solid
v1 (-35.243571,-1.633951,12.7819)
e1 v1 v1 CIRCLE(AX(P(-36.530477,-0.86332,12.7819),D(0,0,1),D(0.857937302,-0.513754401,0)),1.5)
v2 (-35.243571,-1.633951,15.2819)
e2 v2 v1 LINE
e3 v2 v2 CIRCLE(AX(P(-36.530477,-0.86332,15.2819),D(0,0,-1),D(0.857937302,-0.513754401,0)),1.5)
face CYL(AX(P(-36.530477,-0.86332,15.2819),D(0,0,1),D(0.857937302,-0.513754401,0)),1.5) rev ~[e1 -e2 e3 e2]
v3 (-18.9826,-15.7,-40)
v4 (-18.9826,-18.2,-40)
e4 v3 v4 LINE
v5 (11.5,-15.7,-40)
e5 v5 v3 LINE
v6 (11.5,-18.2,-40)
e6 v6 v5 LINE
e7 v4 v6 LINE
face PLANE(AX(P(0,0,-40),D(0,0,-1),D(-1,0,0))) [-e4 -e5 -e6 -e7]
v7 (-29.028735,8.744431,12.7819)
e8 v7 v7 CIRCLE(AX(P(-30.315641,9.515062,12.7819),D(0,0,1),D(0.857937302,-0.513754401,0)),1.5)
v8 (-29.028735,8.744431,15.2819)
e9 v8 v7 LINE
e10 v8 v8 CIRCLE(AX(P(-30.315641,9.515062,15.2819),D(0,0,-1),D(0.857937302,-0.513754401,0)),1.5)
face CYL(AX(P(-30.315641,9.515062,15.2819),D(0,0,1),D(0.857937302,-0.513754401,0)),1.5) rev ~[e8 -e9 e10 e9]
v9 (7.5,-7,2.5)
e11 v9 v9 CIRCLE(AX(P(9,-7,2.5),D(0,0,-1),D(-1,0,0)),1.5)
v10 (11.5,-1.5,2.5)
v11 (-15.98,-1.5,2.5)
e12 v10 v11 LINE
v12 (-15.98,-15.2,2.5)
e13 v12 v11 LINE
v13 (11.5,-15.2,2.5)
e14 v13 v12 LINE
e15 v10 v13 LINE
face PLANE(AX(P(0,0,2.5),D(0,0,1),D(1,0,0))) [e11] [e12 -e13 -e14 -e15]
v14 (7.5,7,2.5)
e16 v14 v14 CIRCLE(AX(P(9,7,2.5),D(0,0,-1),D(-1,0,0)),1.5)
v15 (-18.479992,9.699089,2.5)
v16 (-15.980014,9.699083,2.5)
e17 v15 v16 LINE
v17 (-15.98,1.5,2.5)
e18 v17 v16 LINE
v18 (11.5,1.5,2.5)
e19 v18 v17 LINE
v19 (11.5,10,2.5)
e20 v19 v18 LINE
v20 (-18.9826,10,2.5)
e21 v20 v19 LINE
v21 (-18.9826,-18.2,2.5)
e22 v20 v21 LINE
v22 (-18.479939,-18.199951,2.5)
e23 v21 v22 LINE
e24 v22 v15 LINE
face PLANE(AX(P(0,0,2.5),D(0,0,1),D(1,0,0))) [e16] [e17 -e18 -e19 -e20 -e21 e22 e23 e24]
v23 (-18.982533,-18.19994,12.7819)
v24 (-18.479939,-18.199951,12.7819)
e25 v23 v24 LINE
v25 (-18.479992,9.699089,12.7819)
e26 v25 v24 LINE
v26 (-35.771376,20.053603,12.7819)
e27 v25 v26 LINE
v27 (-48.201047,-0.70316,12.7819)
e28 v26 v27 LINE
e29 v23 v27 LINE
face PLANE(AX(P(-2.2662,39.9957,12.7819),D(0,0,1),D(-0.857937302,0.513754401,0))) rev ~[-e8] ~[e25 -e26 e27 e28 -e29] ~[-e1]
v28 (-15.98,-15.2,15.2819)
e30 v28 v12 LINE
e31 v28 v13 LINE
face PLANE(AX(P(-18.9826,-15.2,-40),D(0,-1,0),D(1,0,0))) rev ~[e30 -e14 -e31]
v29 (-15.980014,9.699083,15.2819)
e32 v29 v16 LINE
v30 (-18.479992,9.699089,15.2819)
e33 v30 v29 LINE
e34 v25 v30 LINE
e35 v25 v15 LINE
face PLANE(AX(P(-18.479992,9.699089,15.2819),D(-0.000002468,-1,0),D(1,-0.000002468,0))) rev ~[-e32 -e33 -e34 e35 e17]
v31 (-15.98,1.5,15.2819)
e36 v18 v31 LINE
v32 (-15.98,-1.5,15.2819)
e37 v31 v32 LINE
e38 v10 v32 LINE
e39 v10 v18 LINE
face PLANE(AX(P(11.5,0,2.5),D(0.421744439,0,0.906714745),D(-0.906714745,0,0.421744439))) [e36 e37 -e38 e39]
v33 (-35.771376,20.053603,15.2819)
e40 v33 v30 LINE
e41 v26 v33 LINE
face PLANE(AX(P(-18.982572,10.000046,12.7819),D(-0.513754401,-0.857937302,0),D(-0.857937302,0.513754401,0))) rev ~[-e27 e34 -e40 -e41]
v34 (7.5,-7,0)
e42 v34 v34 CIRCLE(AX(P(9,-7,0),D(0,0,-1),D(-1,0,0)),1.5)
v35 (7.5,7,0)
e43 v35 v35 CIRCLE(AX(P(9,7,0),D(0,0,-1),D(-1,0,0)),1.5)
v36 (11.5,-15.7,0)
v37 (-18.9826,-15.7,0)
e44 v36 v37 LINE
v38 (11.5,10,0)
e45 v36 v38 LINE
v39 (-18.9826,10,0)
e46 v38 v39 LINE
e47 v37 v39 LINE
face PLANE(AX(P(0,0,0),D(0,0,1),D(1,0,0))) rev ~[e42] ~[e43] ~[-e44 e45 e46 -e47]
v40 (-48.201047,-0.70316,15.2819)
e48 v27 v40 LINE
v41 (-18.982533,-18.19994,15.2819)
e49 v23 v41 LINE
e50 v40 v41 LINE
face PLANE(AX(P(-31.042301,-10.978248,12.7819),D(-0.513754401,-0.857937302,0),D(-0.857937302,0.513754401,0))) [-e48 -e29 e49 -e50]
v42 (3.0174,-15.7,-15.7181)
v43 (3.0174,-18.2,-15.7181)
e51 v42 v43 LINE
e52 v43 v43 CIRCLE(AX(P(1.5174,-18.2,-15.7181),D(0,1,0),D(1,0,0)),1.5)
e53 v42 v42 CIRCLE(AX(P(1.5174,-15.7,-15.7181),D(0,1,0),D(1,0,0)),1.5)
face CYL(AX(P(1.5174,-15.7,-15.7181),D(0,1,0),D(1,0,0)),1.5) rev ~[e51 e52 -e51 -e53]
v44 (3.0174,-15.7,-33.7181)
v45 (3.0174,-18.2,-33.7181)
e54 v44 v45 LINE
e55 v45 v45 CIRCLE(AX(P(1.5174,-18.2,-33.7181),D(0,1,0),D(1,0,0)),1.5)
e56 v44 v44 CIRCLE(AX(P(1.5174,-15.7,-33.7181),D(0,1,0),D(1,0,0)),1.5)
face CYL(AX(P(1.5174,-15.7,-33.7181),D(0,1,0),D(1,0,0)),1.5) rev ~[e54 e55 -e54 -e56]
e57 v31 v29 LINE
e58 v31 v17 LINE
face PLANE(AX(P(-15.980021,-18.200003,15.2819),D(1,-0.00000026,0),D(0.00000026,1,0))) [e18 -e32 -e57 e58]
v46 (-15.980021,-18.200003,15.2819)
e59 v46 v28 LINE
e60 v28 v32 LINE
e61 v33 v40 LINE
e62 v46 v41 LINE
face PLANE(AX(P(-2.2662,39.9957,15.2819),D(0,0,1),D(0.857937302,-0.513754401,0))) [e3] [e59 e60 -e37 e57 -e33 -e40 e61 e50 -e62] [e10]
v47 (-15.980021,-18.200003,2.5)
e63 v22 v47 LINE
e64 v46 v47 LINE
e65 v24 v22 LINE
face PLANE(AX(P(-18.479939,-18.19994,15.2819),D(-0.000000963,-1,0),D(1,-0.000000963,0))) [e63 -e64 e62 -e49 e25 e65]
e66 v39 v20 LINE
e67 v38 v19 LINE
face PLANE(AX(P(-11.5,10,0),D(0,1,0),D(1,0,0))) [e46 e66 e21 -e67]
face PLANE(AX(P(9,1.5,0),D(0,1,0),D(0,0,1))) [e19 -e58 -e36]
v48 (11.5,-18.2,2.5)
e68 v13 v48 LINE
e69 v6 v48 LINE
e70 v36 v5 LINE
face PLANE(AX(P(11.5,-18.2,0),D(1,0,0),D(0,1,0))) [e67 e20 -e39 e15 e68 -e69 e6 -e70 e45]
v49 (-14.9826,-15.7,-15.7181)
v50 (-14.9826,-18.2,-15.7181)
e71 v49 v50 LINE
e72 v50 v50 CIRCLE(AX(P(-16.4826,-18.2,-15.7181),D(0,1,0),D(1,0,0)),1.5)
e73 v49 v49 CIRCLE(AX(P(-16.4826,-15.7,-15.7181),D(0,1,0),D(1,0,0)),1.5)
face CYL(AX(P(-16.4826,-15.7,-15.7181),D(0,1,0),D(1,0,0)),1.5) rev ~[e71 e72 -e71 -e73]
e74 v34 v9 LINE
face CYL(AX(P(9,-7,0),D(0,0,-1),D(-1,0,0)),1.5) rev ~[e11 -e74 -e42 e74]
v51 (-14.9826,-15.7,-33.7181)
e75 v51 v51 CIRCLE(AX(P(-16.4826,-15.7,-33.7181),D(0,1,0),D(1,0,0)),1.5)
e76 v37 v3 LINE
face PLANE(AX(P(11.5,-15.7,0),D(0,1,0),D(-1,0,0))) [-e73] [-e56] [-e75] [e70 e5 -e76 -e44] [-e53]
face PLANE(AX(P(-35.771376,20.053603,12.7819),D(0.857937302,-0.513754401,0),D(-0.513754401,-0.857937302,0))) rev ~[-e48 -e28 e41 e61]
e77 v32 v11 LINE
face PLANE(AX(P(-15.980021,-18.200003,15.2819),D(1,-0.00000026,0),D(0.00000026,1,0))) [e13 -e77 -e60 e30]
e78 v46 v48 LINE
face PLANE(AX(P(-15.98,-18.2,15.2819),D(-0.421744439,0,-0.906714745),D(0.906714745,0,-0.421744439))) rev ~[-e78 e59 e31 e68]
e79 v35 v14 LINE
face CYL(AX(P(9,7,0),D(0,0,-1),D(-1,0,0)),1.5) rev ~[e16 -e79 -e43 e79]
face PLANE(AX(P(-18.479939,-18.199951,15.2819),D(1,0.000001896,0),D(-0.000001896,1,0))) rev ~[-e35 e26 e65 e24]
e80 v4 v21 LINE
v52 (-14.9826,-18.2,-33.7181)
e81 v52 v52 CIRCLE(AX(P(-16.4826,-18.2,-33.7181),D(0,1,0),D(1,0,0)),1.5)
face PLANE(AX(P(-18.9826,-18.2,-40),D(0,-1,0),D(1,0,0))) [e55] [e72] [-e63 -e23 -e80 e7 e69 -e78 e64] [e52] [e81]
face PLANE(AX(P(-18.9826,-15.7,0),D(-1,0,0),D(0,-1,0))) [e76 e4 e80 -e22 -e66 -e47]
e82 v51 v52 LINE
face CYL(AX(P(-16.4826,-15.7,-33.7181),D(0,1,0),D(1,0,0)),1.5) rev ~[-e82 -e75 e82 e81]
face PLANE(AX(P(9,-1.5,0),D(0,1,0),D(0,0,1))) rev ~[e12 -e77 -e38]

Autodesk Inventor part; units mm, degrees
ref_plane "YZ Plane" through (0, 0, 0) normal (1, 0, 0) x (0, 1, 0)
ref_plane "XZ Plane" through (0, 0, 0) normal (0, 1, 0) x (-1, 0, 0)
ref_plane "XY Plane" through (0, 0, 0) normal (0, 0, 1) x (1, 0, 0)
sketch "Sketch1" plane through (0, 0, 0) normal (0, 0, 1) x (1, 0, 0)
  line L0 (-18.9826, -15.7) -> (4.0174, -15.7) projected
  line L1 (11.5, 10) -> (11.5, -10) projected
  line L2 (11.5, -10) -> (-11.5, -10) projected
  line L3 (-11.5, -10) -> (-11.5, 10) projected
  line L4 (-11.5, 10) -> (11.5, 10) projected
  line L5 (-18.9826, -15.7) -> (-18.9826, -14) projected
  line L6 (-18.9826, -15.7) -> (-18.9826, -18.2)
  line L7 (-18.9826, -18.2) -> (11.5, -18.2)
  line L8 (11.5, -18.2) -> (11.5, 10)
  line L9 (11.5, 10) -> (-18.9826, 10)
  line L10 (-18.9826, 10) -> (-18.9826, -18.2)
  point P0 (0, 0)
  dimension "d0" = 2.5
extrude "Extrusion1" add sketch "Sketch1" along normal blind 2.5
sketch "Sketch2" plane through (0, 0, 0) normal (0, 0, -1) x (-1, 0, 0)
  line L0 (18.9826, 10) -> (18.9826, -18.2) projected
  line L1 (-11.5, -18.2) -> (-11.5, 10) projected
  line L2 (18.9826, -18.2) -> (-11.5, -18.2)
  line L3 (-11.5, -18.2) -> (-11.5, -15.7)
  line L4 (-11.5, -15.7) -> (18.9826, -15.7)
  line L5 (18.9826, -15.7) -> (18.9826, -18.2)
  point P0 (0, 0)
  dimension "d3" = 2.5
extrude "Extrusion2" add sketch "Sketch2" along normal blind 40
sketch "Sketch4" plane through (-18.9826, -15.7, 0) normal (0, 1, 0) x (1, 0, 0)
  line L0 (23, 13.2181) -> (23, 36.2181) projected
  line L1 (23, 36.2181) -> (0, 36.2181) projected
  line L2 (0, 36.2181) -> (0, 13.2181) projected
  line L3 (0, 13.2181) -> (23, 13.2181) projected
  circle A0 centre (20.5, 15.7181) radius 1.5 projected
  circle A1 centre (20.5, 33.7181) radius 1.5 projected
  circle A2 centre (2.5, 33.7181) radius 1.5 projected
  circle A3 centre (2.5, 15.7181) radius 1.5 projected
  point P0 (18.9826, 0)
extrude "Extrusion3" cut sketch "Sketch4" against normal blind 40 contours A0 | A1 | A2 | A3
sketch "Sketch5" plane through (0, 0, 0) normal (0, 0, -1) x (-1, 0, 0)
  line L0 (9.8803, 8.3507) -> (9.8803, -8.3507) projected
  line L1 (9.8803, -8.3507) -> (5.0848, -8.3507) projected
  line L2 (5.0848, -8.3507) -> (5.0848, 8.3507) projected
  line L3 (5.0848, 8.3507) -> (9.8803, 8.3507) projected
  line L4 (-11.5, -10) -> (11.5, -10) projected
  line L5 (11.5, -10) -> (11.5, 10) projected
  line L6 (11.5, 10) -> (-11.5, 10) projected
  line L7 (-11.5, 10) -> (-11.5, -10) projected
  circle A0 centre (-9, -7) radius 1.5 projected
  circle A1 centre (-9, 7) radius 1.5 projected
  point P0 (0, 0)
extrude "Extrusion4" cut sketch "Sketch5" against normal blind 40 contours A0 | A1
ref_plane "Work Plane1" through (-2.2662, 39.9957, 12.7819) normal (0, 0, 1) x (-0.8579373, 0.5137544, 0)
sketch "Sketch6" plane through (-2.2662, 39.9957, 12.7819) normal (0, 0, 1) x (-0.8579373, 0.5137544, 0)
  line L0 (18.5, 0) -> (18.5, 93.5988) projected
  line L1 (-1.5, 0) -> (-1.5, 93.5988) projected
  line L2 (21.5, 18.6957) -> (-3.5, 18.6957) projected
  line L3 (-4.5, 75.0357) -> (21.5, 75.0357) projected
  line L4 (-15.5567, 58.5163) -> (-41.7088, 42.8558) projected
  line L5 (-15.5567, 58.5163) -> (18.5, 58.5163)
  line L6 (-27.221, 18.662) -> (-1.0688, 34.3225) projected
  line L7 (-1.0688, 34.3225) -> (18.5, 34.3225)
  line L8 (-1.5, 34.0643) -> (-15.9879, 58.2581)
  line L9 (-1.0688, 34.3225) -> (-1.6546, 34.3225)
  point P0 (-22.4922, 33.1495)
extrude "Extrusion5" add sketch "Sketch6" along normal blind 2.5 contours L7 L9 L1 L5 L0 | L1 L9 L8 L4 L5
sketch "Sketch7" plane through (-2.2662, 39.9957, 15.2819) normal (0, 0, 1) x (0.8579373, -0.5137544, 0)
  line L0 (15.5567, -58.5163) -> (41.7088, -42.8558) projected
  line L1 (15.9879, -58.2581) -> (18.1327, -56.9738)
  line L2 (1.6546, -34.3225) -> (-18.5, -34.3225) projected
  line L3 (1.6546, -34.3225) -> (5.6436, -31.9338)
  line L4 (15.9879, -58.2581) -> (1.6546, -34.3225) projected
  line L5 (18.1327, -56.9738) -> (1.8582, -29.7964)
  point P0 (22.4922, -33.1495)
  point P1 (3.7995, -33.0381)
  dimension "d12" = 2.5
  dimension "d13" = 2.5
extrude "Extrusion6" add sketch "Sketch7" against normal up to surface (12.7819 mm away)
sketch "Sketch8" plane through (-18.9826, -18.2, -40) normal (0, -1, 0) x (1, 0, 0)
  line L0 (3.0026, 55.2819) -> (3.0026, 42.5) projected
  line L1 (30.4826, 0) -> (30.4826, 42.5) projected
  line L2 (3.0026, 55.2819) -> (30.4826, 42.5)
  line L3 (30.4826, 42.5) -> (3.0026, 42.5)
  point P0 (18.9826, 40)
extrude "Extrusion7" add sketch "Sketch8" against normal blind 3
ref_plane "Work Plane4" through (9, 0, 0) normal (0, 1, 0) x (0, 0, 1)
ref_plane "Work Plane2" through (9, -7, 0) normal (0, 1, 0) x (0, 0, 1)
ref_plane "Work Plane3" through (9, 7, 2.5) normal (0, 1, 0) x (0, 0, -1)
sketch "Sketch9" plane through (9, 0, 0) normal (0, 1, 0) x (0, 0, 1)
  line L0 (-40, 2.5) -> (2.5, 2.5) projected
  line L1 (15.2819, -24.98) -> (15.2819, -27.48) projected
  line L2 (2.5, 2.5) -> (15.2819, -24.98)
  line L3 (15.2819, -24.98) -> (2.5, -24.98)
  line L4 (2.5, -24.98) -> (15.2819, -24.98)
  line L5 (2.5, 2.5) -> (2.5, -27.9826) projected
  line L6 (2.5, -24.98) -> (2.5, 2.5)
  point P0 (0, -9)
extrude "Extrusion8" add sketch "Sketch9" along normal mid plane 3
sketch "Sketch10" plane through (-2.2662, 39.9957, 15.2819) normal (0, 0, 1) x (0.8579373, -0.5137544, 0)
  line L0 (-6.3751, 0) -> (-6.3751, -93.5988) projected
  line L1 (-10.4351, 0) -> (-10.4351, -93.5988) projected
  line L2 (-6.3751, -46.7994) -> (-10.4351, -46.7994)
  circle A0 centre (-8.4051, -46.7994) radius 1.5
  line L3 (1.6546, -34.3225) -> (-18.5, -34.3225) projected
  line L4 (-6.3751, -34.3225) -> (-6.3751, -46.7994)
  line L5 (-6.3751, -40.561) -> (-10.4351, -40.561)
  line L6 (-18.5, -58.5163) -> (15.5567, -58.5163) projected
  line L7 (-6.3751, -58.5163) -> (-6.3751, -46.7994)
  line L8 (-6.3751, -52.6579) -> (-10.4351, -52.6579)
  circle A1 centre (-8.4051, -52.6579) radius 1.5
  circle A2 centre (-8.4051, -40.561) radius 1.5
  point P0 (22.4922, -33.1495)
  dimension "d22" = 3
  dimension "d23" = 3
  dimension "d24" = 3
extrude "Extrusion9" cut sketch "Sketch10" against normal blind 3 contours A2 L5 | L5 A2 | A1 L8 | L8 A1
properties part number "counter_sensor_holders" material "PET Plastic"
